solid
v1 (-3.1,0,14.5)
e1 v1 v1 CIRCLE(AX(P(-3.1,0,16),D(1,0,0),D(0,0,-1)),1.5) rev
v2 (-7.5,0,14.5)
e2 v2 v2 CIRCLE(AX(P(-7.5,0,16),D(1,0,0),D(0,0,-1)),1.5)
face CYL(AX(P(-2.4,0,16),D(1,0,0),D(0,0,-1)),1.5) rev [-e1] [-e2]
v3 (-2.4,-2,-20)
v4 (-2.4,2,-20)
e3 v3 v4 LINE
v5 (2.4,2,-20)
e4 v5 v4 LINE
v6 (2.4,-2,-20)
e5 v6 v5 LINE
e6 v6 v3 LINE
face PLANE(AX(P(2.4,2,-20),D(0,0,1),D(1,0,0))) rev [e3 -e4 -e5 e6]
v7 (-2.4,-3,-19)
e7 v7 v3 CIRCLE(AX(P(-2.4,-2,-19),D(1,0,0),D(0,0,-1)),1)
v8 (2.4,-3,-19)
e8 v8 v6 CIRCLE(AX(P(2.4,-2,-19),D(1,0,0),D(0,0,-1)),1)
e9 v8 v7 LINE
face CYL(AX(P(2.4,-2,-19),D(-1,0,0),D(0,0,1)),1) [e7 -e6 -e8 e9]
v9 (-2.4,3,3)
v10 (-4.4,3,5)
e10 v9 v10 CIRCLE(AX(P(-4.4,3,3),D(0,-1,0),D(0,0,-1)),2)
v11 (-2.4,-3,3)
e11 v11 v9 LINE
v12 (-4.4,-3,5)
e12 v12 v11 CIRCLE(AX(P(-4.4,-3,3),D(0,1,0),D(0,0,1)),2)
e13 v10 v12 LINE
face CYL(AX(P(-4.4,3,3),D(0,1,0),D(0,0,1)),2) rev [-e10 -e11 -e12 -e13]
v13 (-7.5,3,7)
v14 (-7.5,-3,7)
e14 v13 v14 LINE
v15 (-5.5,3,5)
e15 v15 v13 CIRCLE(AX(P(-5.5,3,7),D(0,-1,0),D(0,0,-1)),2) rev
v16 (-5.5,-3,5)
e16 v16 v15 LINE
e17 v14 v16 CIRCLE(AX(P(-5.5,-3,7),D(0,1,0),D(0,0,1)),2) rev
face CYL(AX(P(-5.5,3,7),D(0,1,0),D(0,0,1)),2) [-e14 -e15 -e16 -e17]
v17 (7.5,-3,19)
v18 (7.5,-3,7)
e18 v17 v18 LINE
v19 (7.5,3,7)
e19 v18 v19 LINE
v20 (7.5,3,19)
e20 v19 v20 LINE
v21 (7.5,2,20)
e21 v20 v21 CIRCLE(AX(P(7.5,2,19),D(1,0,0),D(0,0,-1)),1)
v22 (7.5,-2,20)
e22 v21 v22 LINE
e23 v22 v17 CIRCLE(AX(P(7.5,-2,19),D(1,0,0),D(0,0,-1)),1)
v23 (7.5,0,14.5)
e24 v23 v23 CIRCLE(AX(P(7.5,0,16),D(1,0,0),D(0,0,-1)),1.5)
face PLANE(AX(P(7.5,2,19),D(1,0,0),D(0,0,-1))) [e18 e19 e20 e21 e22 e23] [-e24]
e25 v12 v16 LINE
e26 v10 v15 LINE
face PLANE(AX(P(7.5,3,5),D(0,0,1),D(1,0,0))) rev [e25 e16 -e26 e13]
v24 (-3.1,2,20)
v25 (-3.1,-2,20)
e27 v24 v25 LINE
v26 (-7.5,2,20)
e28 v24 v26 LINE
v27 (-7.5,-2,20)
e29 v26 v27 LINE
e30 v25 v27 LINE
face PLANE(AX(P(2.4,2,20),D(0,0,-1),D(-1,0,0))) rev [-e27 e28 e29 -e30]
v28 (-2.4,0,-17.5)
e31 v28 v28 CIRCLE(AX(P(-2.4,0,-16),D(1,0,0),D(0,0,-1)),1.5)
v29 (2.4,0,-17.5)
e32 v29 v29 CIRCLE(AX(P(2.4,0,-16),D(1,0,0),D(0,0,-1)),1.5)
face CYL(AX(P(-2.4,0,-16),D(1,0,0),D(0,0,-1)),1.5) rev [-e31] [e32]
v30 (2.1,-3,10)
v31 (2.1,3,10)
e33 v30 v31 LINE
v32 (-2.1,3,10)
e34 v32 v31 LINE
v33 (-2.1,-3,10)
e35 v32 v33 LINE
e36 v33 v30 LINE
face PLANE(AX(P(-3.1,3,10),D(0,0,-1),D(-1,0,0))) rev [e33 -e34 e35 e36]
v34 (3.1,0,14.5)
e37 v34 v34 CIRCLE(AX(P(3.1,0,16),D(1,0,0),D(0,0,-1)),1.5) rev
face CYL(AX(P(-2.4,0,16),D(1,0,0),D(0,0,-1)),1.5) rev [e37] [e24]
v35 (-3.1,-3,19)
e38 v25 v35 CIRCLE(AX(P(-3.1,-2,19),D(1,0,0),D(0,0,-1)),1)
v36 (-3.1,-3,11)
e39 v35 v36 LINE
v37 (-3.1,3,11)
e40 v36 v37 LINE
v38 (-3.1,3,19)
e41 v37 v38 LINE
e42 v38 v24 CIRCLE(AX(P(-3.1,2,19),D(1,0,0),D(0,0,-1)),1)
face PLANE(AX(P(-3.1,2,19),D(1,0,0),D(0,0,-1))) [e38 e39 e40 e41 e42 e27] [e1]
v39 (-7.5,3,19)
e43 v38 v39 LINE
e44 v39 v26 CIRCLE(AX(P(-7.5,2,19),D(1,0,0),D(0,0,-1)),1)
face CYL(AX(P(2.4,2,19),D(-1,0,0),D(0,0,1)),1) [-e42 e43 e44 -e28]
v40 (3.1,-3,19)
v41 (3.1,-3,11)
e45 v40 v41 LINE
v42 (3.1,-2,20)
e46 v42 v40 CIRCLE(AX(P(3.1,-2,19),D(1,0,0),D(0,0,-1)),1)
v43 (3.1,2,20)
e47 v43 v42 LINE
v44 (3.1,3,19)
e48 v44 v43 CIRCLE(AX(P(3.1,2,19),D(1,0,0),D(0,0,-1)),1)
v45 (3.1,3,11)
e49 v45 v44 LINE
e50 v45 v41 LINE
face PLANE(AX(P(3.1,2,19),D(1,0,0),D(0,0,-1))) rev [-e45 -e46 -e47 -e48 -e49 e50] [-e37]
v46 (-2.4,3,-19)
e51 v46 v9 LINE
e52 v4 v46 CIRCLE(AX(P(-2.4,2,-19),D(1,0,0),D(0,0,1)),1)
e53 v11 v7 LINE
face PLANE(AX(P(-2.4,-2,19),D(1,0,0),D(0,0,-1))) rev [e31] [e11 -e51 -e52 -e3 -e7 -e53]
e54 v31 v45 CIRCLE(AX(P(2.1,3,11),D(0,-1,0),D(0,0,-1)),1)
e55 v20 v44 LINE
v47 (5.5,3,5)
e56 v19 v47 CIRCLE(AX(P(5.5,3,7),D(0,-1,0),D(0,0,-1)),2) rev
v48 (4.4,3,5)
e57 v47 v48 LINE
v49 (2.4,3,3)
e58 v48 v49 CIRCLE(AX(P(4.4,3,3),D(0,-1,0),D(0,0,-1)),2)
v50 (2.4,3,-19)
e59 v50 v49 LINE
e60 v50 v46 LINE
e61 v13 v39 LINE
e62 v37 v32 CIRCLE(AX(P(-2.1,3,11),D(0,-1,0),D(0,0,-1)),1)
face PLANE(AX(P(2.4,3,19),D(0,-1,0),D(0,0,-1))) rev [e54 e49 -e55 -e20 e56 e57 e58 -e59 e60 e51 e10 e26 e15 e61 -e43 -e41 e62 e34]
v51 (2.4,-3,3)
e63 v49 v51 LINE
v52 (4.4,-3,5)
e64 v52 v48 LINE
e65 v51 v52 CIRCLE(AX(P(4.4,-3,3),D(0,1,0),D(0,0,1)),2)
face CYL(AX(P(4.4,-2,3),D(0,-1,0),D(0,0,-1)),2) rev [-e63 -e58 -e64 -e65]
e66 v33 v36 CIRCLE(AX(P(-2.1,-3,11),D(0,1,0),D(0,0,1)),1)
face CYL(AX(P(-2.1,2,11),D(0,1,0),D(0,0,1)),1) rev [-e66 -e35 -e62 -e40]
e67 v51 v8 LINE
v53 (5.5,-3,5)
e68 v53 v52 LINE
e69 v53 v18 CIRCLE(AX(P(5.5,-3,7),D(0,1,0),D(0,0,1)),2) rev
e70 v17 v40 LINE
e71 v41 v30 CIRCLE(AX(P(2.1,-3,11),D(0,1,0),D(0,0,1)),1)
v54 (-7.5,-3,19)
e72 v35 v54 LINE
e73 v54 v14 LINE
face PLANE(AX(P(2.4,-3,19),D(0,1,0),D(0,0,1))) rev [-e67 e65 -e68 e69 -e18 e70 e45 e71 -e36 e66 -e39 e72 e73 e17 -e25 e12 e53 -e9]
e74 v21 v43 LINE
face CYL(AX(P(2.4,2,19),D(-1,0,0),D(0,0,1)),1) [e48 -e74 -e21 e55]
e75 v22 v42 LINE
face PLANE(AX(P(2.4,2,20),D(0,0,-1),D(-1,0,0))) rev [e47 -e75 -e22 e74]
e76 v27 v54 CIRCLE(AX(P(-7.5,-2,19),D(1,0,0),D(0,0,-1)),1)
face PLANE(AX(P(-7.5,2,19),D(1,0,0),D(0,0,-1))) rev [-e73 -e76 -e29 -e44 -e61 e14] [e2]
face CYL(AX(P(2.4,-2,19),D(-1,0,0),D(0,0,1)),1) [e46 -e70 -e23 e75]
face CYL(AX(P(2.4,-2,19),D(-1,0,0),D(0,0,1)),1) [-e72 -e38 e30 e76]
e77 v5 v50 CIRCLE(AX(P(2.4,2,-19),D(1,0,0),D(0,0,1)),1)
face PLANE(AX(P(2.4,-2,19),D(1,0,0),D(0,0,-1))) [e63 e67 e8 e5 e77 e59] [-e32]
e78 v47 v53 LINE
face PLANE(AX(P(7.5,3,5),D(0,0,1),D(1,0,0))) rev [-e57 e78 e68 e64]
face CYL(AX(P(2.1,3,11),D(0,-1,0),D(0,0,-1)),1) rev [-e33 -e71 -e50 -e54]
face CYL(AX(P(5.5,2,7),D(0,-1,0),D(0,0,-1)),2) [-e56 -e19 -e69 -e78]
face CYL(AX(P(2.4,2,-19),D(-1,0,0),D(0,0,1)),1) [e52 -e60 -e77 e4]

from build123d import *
from build123d.topology import SkipClean

# Parameters (mm, degrees)
SALIENTE_EXTRUIR1_DEPTH    = 2.4
CORTAR_EXTRUIR1_DEPTH      = 21.365657367
CORTAR_EXTRUIR1_DEPTH_BACK = 21.365657367
CROQUIS2_R                 = 1.5
CROQUIS3_R                 = 1.5
SALIENTE_EXTRUIR2_DEPTH    = 7.5
CORTAR_EXTRUIR2_DEPTH      = 3.1
REDONDEO1_R                = 2
REDONDEO2_R                = 1


with BuildPart() as part:
    # Croquis1 → Saliente-Extruir1 (new, symmetric)
    with BuildSketch(Plane(origin=(0, 0, 0), x_dir=(0, 0, -1), z_dir=(1, 0, 0))):
        with BuildLine():
            Line((-19, 3), (19, 3))
            ThreePointArc((19, 3), (19.707106781, 2.707106781), (20, 2))
            Line((20, 2), (20, -2))
            ThreePointArc((20, -2), (19.707106781, -2.707106781), (19, -3))
            Line((19, -3), (-19, -3))
            ThreePointArc((-19, -3), (-19.707106781, -2.707106781), (-20, -2))
            Line((-20, -2), (-20, 2))
            ThreePointArc((-20, 2), (-19.707106781, 2.707106781), (-19, 3))
        make_face()
    extrude(amount=SALIENTE_EXTRUIR1_DEPTH, both=True)

    # Croquis2 → Cortar-Extruir1 (cut, two sides: drawn at the far end of the back side and taken through both)
    with BuildSketch(Plane(origin=(0, 0, 0), x_dir=(0, 0, -1), z_dir=(1, 0, 0)).offset(-CORTAR_EXTRUIR1_DEPTH_BACK)):
        with Locations((-16, 0)):
            Circle(CROQUIS2_R)
        with Locations((16, 0)):
            Circle(CROQUIS2_R)
    extrude(amount=CORTAR_EXTRUIR1_DEPTH + CORTAR_EXTRUIR1_DEPTH_BACK, mode=Mode.SUBTRACT)

    # Croquis3 → Saliente-Extruir2 (add, symmetric)
    with SkipClean():  # the faces are left unmerged after this step: merging them gives an invalid solid
        with BuildSketch(Plane(origin=(0, 0, 0), x_dir=(0, 0, -1), z_dir=(1, 0, 0))):
            with BuildLine():
                Line((-20, 2), (-20, -2))
                ThreePointArc((-20, -2), (-19.707106781, -2.707106781), (-19, -3))
                Line((-19, -3), (-5, -3))
                Line((-5, -3), (-5, 3))
                Line((-5, 3), (-19, 3))
                ThreePointArc((-19, 3), (-19.707106781, 2.707106781), (-20, 2))
            make_face()
            with Locations((-16, 0)):
                Circle(CROQUIS3_R, mode=Mode.SUBTRACT)
        extrude(amount=SALIENTE_EXTRUIR2_DEPTH, both=True)
    add(part.part.scale(1), mode=Mode.REPLACE)  # the faces are merged on a copy

    # Croquis4 → Cortar-Extruir2 (cut, symmetric)
    with BuildSketch(Plane(origin=(0, 0, 0), x_dir=(0, 0, -1), z_dir=(1, 0, 0))):
        with BuildLine():
            Line((-19, 3), (-10, 3))
            Line((-10, 3), (-10, -3))
            Line((-10, -3), (-19, -3))
            ThreePointArc((-19, -3), (-19.707106781, -2.707106781), (-20, -2))
            Line((-20, -2), (-20, 2))
            ThreePointArc((-20, 2), (-19.707106781, 2.707106781), (-19, 3))
        make_face()
    extrude(amount=CORTAR_EXTRUIR2_DEPTH, both=True, mode=Mode.SUBTRACT)

    # Redondeo1
    redondeo1_edges = [part.edges().sort_by_distance(p)[0] for p in [
        (-2.4, 0, 5),
        (2.4, 0, 5),
        (-7.5, 0, 5),
        (7.5, 0, 5),
    ]]
    fillet(redondeo1_edges, radius=REDONDEO1_R)

    # Redondeo2
    redondeo2_edges = [part.edges().sort_by_distance(p)[0] for p in [
        (3.1, 0, 10),
        (-3.1, 0, 10),
    ]]
    fillet(redondeo2_edges, radius=REDONDEO2_R)


solid = part.part
